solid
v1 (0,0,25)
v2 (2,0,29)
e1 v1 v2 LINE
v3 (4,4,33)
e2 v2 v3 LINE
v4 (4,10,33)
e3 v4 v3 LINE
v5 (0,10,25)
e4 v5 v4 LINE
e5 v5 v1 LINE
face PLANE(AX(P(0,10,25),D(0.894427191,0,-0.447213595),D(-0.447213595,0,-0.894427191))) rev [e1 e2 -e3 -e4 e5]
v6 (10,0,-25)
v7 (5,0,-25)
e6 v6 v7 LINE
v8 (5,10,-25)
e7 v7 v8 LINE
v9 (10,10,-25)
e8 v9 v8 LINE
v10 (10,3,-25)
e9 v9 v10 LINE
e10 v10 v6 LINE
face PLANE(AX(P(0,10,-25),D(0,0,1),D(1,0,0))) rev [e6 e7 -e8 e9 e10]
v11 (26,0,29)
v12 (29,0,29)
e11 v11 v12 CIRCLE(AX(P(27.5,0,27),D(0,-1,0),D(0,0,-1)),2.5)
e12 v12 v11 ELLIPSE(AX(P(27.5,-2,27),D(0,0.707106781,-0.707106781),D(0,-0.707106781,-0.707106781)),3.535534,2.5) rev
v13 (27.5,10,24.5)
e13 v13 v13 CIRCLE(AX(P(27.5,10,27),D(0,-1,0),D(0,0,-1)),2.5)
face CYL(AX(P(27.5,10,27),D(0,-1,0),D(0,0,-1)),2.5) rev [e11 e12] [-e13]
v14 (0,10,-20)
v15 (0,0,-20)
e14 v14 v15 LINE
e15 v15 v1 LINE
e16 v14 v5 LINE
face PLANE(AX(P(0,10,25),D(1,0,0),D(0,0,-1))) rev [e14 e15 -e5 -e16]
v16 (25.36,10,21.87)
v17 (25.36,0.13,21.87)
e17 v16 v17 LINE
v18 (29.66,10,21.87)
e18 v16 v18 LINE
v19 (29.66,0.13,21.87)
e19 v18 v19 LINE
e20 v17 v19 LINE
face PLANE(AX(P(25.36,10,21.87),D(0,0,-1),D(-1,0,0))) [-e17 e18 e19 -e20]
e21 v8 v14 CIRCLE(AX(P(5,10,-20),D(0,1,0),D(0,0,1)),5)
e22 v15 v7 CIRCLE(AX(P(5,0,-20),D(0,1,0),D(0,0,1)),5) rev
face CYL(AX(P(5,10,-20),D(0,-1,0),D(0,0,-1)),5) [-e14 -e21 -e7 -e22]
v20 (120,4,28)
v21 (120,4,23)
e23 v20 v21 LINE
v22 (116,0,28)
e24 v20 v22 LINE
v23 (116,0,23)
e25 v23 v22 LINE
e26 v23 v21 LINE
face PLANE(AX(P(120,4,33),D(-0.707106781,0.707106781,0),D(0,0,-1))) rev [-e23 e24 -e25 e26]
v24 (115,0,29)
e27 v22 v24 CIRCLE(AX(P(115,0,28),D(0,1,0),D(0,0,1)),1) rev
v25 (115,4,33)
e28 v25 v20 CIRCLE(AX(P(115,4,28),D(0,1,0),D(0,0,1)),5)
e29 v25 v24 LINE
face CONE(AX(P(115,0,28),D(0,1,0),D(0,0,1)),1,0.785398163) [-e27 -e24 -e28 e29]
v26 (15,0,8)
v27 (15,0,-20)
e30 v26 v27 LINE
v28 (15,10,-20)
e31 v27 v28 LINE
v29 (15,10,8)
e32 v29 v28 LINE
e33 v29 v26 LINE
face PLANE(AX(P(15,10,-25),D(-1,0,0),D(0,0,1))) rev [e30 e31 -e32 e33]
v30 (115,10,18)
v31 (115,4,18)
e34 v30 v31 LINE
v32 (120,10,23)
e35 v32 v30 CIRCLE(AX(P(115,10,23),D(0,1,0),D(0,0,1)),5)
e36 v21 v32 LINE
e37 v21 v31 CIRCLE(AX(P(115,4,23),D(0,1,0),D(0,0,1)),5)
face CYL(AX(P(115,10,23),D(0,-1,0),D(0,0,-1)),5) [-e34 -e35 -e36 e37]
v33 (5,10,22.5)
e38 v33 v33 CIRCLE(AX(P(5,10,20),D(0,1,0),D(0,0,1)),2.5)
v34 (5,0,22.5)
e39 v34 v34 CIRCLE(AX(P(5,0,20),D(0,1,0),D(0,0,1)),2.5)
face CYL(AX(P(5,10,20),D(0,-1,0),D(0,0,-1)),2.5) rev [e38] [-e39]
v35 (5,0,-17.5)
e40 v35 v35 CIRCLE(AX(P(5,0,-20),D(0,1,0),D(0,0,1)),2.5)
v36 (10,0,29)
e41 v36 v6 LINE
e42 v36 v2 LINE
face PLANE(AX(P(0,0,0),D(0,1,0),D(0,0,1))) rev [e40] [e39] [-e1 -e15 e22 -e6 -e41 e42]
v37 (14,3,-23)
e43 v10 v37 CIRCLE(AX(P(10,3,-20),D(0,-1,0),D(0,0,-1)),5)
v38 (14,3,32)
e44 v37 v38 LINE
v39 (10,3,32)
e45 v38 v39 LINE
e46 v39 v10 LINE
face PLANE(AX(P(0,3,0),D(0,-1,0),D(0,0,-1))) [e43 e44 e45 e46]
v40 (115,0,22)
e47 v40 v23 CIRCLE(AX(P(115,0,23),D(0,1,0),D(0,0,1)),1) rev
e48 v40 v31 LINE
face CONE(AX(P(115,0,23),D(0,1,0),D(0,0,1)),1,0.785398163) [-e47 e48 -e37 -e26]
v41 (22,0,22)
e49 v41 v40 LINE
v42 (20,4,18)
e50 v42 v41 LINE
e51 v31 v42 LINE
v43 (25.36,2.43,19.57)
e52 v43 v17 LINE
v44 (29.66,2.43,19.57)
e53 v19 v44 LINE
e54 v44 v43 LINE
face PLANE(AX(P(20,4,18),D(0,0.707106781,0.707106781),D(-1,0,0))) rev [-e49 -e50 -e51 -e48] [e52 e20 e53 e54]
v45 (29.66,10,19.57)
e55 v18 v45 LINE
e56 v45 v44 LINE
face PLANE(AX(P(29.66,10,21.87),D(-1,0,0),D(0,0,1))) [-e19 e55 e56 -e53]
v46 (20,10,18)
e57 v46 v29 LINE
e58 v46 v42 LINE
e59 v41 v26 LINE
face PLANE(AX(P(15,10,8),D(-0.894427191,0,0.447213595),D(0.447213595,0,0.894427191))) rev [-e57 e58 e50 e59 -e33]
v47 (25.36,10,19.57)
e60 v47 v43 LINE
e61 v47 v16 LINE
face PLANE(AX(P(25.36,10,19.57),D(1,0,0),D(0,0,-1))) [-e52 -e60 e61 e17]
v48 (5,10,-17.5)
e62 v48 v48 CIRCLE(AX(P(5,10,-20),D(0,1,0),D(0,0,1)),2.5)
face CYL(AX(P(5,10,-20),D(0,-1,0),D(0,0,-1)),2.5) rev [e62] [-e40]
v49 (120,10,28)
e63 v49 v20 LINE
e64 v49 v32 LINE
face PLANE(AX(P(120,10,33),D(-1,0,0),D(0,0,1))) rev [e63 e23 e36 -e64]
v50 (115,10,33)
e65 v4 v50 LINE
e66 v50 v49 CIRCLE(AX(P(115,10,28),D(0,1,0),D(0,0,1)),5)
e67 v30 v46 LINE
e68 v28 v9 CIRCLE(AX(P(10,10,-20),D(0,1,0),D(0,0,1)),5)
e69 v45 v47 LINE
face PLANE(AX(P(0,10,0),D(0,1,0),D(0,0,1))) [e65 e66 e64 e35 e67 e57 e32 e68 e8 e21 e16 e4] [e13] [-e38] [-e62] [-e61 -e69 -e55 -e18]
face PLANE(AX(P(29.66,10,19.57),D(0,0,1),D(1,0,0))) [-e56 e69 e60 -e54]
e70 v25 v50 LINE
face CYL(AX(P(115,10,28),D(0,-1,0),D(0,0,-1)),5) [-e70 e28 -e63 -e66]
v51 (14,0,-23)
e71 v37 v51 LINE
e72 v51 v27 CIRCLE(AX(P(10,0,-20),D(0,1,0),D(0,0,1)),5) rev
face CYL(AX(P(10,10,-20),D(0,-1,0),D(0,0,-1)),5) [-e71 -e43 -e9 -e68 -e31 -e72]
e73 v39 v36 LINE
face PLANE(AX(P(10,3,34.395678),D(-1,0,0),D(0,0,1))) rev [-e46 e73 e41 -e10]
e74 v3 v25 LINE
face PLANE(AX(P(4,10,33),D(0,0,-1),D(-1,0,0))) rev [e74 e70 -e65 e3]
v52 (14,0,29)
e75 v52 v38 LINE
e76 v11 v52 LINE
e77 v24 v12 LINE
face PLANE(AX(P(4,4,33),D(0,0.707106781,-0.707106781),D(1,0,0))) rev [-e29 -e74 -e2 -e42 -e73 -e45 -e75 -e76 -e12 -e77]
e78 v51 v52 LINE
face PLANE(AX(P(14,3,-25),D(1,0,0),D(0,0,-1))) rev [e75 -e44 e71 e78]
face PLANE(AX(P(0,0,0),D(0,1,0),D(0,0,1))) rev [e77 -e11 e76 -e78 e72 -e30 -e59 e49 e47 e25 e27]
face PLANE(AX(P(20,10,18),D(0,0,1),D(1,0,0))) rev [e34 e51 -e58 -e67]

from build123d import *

# Parameters (mm, degrees)
SKETCH1_R           = 2.5
SKETCH1_W           = 4.3
SKETCH1_H           = 2.3
BOSS_EXTRUDE1_DEPTH = 10
SKETCH2_W           = 4
SKETCH2_H           = 59.39567842
CUT_EXTRUDE1_DEPTH  = 3
FILLET3_R           = 5
CHAMFER2_SIZE       = 4
SKETCH3_R           = 2.5
CUT_EXTRUDE2_DEPTH  = 10


with BuildPart() as part:
    # Sketch1 → Boss-Extrude1 (new body)
    with BuildSketch(Plane(origin=(0, 0, 0), x_dir=(1, 0, 0), z_dir=(0, 1, 0))):
        Polygon((0, -25), (0, 25), (15, 25), (15, -8), (20, -18), (32, -18), (35, -18), (120, -18), (120, -33), (4, -33), align=None)
        with Locations(Location((5, 20, 0), (0, 0, 270))):
            Circle(SKETCH1_R, mode=Mode.SUBTRACT)
        with Locations(Location((5, -20, 0), (0, 0, 270))):
            Circle(SKETCH1_R, mode=Mode.SUBTRACT)
        with Locations((27.51, -20.72)):
            Rectangle(SKETCH1_W, SKETCH1_H, mode=Mode.SUBTRACT)
    extrude(amount=BOSS_EXTRUDE1_DEPTH)

    # Sketch2 → Cut-Extrude1 (cut)
    with BuildSketch(Plane.XZ):
        with Locations((12, 4.69783921)):
            Rectangle(SKETCH2_W, SKETCH2_H)
    extrude(amount=-CUT_EXTRUDE1_DEPTH, mode=Mode.SUBTRACT)

    # Fillet3
    fillet3_edges = [part.edges().sort_by_distance(p)[0] for p in [
        (120, 5, 33),
        (120, 5, 18),
        (0, 5, -25),
        (15, 5, -25),
    ]]
    fillet(fillet3_edges, radius=FILLET3_R)

    # Chamfer2
    # the kernel refuses this chamfer: 4 mm, written as the material it takes off along each edge
    with BuildSketch(Plane(origin=(20.286731952, 0, 33), x_dir=(0, -0.027495876610586365, -0.9996219169112968), z_dir=(-1, 0, 0))) as chamfer2_piece_1:
        Polygon((CHAMFER2_SIZE * 0.999621916911, -CHAMFER2_SIZE * 0.0274958766106), (-CHAMFER2_SIZE * 0.0274958766106, -CHAMFER2_SIZE * 0.999621916911), (0, 0), align=None)
    extrude(amount=26.573463904, mode=Mode.SUBTRACT)
    with BuildSketch(Plane(origin=(115, 0, 33), x_dir=(0, 0.9996219169112968, 0.02749587661058563), z_dir=(-1, 0, 0))) as chamfer2_piece_2:
        Polygon((CHAMFER2_SIZE * 0.999621916911, CHAMFER2_SIZE * 0.0274958766106), (-CHAMFER2_SIZE * 0.0274958766106, CHAMFER2_SIZE * 0.999621916911), (0, 0), align=None)
    extrude(amount=111.286731952, mode=Mode.SUBTRACT)
    with BuildSketch(Plane(origin=(120, 0, 23), x_dir=(0.02749587661058563, 0.9996219169112968, 0), z_dir=(0, 0, 1))) as chamfer2_piece_3:
        Polygon((CHAMFER2_SIZE * 0.999621916911, CHAMFER2_SIZE * 0.0274958766106), (-CHAMFER2_SIZE * 0.0274958766106, CHAMFER2_SIZE * 0.999621916911), (0, 0), align=None)
    extrude(amount=5, mode=Mode.SUBTRACT)
    with BuildSketch(Plane(origin=(115, 0, 18), x_dir=(0, 0.999621916911297, -0.02749587661058045), z_dir=(-1, 0, 0))) as chamfer2_piece_4_section:
        Polygon((CHAMFER2_SIZE * 0.999621916911, -CHAMFER2_SIZE * 0.0274958766106), (-CHAMFER2_SIZE * 0.0274958766106, -CHAMFER2_SIZE * 0.999621916911), (0, 0), align=None)
    chamfer2_piece_4 = extrude(amount=105.286731952, mode=Mode.PRIVATE)
    chamfer2_piece_4 = split(chamfer2_piece_4, bisect_by=Plane(origin=(30.091205291, 1.322053336, 38.182410583), z_dir=(0.8944271909999159, 0, -0.4472135954999581)), keep=Keep.TOP, mode=Mode.PRIVATE)
    add(chamfer2_piece_4, mode=Mode.SUBTRACT)
    with BuildSketch(Plane(origin=(115, 0, 23), x_dir=(0, 0, -1), z_dir=(-1, 0, 0))) as chamfer2_piece_5:
        Polygon((5, -CHAMFER2_SIZE), (5 - CHAMFER2_SIZE, 0), (5, 0), align=None)
    revolve(axis=Axis((115, 0, 23), (0, -1, 0)), revolution_arc=90, mode=Mode.SUBTRACT)
    with BuildSketch(Plane(origin=(115, 0, 28), x_dir=(0, 0, 1), z_dir=(-1, 0, 0))) as chamfer2_piece_6:
        Polygon((5, CHAMFER2_SIZE), (5 - CHAMFER2_SIZE, 0), (5, 0), align=None)
    revolve(axis=Axis((115, 0, 28), (0, 1, 0)), revolution_arc=90, mode=Mode.SUBTRACT)

    # Sketch3 → Cut-Extrude2 (cut)
    with BuildSketch(Plane.XZ):
        with Locations(Location((27.5, 27, 0), (0, 0, 270))):
            Circle(SKETCH3_R)
    extrude(amount=-CUT_EXTRUDE2_DEPTH, mode=Mode.SUBTRACT)


solid = part.part
